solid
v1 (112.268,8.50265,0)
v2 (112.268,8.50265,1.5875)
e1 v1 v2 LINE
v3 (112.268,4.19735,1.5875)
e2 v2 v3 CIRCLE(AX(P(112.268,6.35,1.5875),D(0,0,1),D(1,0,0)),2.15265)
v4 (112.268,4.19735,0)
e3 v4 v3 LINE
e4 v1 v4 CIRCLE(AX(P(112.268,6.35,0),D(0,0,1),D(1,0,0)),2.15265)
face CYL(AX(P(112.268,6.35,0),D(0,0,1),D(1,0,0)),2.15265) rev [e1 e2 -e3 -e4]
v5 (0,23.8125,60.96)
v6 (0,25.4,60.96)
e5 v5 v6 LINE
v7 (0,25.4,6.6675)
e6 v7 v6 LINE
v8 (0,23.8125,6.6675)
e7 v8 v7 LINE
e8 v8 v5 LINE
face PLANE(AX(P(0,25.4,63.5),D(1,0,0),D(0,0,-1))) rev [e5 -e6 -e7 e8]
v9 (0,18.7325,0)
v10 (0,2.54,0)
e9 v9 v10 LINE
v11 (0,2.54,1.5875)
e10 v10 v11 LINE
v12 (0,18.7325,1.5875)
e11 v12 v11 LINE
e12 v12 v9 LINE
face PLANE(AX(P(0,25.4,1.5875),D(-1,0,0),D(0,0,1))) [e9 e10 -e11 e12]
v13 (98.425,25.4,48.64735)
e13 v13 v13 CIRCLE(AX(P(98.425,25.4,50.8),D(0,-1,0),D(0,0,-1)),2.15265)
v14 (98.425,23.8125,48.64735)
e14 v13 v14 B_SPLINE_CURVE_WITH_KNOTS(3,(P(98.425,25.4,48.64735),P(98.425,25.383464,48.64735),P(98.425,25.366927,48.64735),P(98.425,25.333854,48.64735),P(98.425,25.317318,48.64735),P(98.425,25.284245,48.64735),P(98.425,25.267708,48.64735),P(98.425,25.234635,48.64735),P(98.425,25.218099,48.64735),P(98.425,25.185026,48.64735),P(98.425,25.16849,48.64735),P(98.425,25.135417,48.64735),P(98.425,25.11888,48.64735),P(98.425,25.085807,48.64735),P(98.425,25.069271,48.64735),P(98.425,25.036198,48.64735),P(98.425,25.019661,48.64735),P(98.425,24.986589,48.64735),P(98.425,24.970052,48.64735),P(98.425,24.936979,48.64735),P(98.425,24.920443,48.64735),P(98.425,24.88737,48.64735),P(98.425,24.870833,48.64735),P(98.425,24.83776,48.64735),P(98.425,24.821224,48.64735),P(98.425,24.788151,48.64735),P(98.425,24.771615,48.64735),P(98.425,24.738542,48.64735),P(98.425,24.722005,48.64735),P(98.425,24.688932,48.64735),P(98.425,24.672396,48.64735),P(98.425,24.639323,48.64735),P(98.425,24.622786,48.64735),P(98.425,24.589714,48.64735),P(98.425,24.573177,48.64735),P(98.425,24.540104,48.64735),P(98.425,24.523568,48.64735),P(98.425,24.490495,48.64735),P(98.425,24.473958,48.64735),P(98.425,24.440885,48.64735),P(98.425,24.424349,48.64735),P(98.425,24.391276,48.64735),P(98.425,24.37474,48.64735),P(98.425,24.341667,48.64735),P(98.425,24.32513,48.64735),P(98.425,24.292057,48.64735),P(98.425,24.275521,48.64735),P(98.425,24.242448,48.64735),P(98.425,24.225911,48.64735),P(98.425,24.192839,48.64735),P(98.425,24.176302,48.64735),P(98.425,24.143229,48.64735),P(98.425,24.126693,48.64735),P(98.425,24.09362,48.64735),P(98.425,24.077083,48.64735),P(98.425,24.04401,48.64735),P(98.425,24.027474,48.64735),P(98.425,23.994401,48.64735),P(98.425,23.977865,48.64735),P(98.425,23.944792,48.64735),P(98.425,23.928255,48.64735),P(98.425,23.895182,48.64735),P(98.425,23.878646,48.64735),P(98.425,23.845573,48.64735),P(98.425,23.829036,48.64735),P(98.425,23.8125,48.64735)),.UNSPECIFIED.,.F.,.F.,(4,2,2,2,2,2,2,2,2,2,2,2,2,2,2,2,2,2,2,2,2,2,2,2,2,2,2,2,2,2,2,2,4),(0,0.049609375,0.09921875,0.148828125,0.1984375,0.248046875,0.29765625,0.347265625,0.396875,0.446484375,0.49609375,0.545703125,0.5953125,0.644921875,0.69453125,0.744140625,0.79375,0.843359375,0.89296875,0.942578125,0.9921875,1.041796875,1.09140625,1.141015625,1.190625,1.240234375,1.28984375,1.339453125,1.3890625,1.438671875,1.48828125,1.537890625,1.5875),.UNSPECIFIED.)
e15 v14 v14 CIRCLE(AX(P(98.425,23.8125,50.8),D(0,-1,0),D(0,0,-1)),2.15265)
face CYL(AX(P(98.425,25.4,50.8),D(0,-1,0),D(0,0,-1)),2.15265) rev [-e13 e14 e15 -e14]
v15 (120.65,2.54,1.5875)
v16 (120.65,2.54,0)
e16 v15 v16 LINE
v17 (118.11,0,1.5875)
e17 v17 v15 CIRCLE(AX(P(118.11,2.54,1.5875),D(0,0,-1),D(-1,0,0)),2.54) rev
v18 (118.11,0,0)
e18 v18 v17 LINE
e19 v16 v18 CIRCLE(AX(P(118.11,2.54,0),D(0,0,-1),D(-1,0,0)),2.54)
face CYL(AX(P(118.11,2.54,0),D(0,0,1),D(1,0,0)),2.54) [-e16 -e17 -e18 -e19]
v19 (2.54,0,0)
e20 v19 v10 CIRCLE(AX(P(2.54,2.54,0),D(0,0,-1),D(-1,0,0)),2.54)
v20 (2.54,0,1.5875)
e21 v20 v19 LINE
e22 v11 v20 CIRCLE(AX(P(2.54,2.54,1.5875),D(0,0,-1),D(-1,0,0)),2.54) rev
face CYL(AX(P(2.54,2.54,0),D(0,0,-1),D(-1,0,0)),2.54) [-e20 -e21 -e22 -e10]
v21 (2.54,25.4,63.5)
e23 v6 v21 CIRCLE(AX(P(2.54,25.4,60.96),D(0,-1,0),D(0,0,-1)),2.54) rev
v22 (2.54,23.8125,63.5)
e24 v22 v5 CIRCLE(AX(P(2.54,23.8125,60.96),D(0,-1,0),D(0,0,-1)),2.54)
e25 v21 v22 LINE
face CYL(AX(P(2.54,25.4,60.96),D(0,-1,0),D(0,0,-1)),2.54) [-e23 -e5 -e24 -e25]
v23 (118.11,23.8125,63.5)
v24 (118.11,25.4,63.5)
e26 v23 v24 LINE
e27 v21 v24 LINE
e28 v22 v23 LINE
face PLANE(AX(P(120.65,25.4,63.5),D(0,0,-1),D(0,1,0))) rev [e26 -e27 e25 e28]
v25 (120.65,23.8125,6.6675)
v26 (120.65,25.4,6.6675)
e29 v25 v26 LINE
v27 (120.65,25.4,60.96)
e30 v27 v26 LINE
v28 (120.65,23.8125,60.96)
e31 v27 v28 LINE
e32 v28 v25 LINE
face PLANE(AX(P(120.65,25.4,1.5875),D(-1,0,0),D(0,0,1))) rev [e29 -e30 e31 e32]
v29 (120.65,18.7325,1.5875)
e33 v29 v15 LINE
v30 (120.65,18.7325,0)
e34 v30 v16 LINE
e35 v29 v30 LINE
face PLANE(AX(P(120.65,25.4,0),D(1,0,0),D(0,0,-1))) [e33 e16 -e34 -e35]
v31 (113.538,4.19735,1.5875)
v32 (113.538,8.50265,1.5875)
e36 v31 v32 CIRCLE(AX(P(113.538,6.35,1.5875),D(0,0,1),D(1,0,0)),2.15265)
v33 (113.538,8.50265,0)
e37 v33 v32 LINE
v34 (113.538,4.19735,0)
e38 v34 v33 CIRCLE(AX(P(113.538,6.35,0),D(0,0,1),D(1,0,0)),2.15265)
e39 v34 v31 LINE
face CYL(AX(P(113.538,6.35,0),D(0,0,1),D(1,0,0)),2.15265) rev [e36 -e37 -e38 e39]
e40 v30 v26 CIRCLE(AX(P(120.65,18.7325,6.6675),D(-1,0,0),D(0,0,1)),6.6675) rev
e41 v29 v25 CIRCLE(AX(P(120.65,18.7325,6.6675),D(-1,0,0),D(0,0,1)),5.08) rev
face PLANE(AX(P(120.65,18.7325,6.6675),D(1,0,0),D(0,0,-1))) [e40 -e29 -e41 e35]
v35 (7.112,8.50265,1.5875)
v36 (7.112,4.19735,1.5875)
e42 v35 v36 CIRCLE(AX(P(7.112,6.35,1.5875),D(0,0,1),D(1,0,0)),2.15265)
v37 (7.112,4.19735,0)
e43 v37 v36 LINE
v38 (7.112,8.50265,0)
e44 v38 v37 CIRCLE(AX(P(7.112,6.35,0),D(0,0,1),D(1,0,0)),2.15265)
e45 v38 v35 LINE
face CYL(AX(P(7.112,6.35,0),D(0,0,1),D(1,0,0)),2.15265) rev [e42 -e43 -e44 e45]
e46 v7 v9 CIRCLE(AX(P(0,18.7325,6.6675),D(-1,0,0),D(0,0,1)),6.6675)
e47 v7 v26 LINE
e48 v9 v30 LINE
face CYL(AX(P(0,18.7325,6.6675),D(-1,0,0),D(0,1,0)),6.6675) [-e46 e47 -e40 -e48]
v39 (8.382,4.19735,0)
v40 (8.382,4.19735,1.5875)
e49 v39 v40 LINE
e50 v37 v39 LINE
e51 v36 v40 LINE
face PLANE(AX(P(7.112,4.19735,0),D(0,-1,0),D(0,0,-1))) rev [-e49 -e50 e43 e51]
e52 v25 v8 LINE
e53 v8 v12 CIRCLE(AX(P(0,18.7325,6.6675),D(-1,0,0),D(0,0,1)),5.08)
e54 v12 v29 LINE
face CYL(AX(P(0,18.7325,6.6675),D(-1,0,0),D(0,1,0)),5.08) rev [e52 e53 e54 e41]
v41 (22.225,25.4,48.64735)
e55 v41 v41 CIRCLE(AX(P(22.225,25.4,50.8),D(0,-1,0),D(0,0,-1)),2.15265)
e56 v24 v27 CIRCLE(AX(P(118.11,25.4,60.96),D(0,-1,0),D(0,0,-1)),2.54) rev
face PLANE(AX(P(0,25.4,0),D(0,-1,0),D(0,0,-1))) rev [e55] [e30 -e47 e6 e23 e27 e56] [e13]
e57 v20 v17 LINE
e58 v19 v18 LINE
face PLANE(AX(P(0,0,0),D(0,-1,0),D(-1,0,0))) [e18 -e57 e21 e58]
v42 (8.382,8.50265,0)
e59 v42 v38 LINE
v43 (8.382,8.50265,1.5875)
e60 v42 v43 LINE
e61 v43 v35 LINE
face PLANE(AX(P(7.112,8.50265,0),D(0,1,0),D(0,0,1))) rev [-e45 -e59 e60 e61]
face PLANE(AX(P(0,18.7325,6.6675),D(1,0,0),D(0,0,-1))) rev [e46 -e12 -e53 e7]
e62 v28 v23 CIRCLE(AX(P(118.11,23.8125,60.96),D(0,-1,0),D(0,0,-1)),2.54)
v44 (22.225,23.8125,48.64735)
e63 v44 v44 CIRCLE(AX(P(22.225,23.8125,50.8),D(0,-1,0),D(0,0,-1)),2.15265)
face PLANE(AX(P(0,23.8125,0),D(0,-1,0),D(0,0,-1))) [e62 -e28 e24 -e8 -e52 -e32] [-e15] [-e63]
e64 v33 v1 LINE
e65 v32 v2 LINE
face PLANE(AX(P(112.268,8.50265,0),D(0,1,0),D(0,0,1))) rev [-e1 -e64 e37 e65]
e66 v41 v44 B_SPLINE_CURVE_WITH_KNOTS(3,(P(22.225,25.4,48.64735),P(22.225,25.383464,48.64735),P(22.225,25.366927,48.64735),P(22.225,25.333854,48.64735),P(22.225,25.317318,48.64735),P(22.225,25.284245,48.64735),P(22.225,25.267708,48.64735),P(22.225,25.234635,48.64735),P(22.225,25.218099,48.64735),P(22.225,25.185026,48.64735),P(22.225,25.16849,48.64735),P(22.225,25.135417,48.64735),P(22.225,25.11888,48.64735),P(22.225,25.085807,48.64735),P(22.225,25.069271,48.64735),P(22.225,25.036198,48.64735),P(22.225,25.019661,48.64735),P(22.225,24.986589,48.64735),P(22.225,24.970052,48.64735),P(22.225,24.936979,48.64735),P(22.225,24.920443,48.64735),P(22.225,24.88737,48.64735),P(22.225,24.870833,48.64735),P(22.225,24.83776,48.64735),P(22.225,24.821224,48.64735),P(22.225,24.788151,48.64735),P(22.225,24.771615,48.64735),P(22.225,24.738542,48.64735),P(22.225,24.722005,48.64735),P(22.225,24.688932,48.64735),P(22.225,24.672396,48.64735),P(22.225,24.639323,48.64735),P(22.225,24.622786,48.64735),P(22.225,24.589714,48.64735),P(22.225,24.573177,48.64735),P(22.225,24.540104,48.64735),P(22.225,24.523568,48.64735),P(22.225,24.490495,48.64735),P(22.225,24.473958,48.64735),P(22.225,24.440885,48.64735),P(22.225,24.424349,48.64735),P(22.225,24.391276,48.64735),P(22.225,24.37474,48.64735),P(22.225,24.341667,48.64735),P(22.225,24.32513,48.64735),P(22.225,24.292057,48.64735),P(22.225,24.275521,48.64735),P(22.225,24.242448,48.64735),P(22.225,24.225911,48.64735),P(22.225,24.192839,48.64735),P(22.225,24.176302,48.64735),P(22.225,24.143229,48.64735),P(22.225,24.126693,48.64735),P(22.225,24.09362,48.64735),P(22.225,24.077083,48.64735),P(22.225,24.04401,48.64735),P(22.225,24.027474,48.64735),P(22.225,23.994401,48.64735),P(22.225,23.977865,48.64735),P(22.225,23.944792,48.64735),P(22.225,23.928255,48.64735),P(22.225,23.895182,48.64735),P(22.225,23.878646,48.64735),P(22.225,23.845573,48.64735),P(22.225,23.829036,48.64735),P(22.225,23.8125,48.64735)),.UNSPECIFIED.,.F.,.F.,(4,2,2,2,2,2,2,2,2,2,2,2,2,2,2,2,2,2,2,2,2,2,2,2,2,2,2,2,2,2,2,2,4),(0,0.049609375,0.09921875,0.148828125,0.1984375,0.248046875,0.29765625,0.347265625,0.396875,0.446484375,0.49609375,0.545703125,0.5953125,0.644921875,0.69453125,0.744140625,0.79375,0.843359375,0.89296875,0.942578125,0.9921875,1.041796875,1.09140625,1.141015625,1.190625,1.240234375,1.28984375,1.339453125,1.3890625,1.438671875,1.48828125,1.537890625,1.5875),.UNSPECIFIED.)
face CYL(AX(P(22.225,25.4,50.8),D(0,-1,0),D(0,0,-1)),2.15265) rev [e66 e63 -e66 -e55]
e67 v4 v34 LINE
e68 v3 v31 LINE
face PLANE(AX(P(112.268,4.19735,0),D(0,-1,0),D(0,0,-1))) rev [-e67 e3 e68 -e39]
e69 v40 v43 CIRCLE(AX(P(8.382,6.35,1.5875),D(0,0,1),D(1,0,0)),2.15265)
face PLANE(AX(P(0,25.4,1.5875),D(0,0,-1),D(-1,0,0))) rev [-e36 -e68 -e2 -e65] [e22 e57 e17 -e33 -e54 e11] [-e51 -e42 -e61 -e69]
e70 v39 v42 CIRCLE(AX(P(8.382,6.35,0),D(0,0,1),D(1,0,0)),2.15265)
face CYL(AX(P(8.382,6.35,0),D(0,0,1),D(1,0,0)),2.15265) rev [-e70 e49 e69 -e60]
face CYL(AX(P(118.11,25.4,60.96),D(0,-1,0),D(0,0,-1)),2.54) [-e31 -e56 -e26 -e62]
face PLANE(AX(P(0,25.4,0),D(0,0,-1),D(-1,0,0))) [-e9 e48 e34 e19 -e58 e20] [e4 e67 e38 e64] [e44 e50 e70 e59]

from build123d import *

# Parameters (mm, degrees)
SKETCH2_W                    = 120.65
SKETCH2_H                    = 1.5875
BASE_FLANGE1_DEPTH           = 25.4
EDGE_FLANGE1_STRIP_W         = 16.51
EDGE_FLANGE1_STRIP_H         = 1.5875
EDGE_FLANGE1_STRIP_CUT_DEPTH = 120.65
EDGE_FLANGE1_DEPTH           = 120.65
FILLET1_R                    = 2.54
CUT_EXTRUDE1_DEPTH           = 138.966445762
SKETCH11_R                   = 2.15265
CUT_EXTRUDE2_DEPTH           = 139.404146095


# Sheet-metal steps are written as plain solids
with BuildPart() as part:
    # Sketch2 → Base-Flange1 (new body)
    with BuildSketch(Plane(origin=(0, 0, 0), x_dir=(1, 0, 0), z_dir=(0, 1, 0))):
        with Locations((60.325, -0.79375)):
            Rectangle(SKETCH2_W, SKETCH2_H)
    extrude(amount=BASE_FLANGE1_DEPTH)

    # Edge-Flange1 strip (across the edge) → Edge-Flange1 strip cut (cut)
    with BuildSketch(Plane(origin=(120.65, 25.4, 1.5875), x_dir=(0, -1, 0), z_dir=(-1, 0, 0))):
        with Locations((-1.5875, -0.79375)):
            Rectangle(EDGE_FLANGE1_STRIP_W, EDGE_FLANGE1_STRIP_H)
    extrude(amount=EDGE_FLANGE1_STRIP_CUT_DEPTH, mode=Mode.SUBTRACT)

    # Edge-Flange1 section (across the edge) → Edge-Flange1 (add)
    with BuildSketch(Plane(origin=(120.65, 25.4, 1.5875), x_dir=(0, -1, 0), z_dir=(-1, 0, 0))):
        with BuildLine():
            Line((0, 5.08), (0, 61.9125))
            Line((0, 61.9125), (1.5875, 61.9125))
            Line((1.5875, 61.9125), (1.5875, 5.08))
            ThreePointArc((1.5875, 5.08), (3.075397552, 1.487897552), (6.6675, 0))
            Line((6.6675, 0), (6.6675, -1.5875))
            ThreePointArc((6.6675, -1.5875), (1.952865536, 0.365365536), (0, 5.08))
        make_face()
    extrude(amount=EDGE_FLANGE1_DEPTH)

    # Fillet1
    fillet1_edges = [part.edges().sort_by_distance(p)[0] for p in [
        (120.65, 24.60625, 63.5),
        (0, 24.60625, 63.5),
        (0, 0, 0.79375),
        (120.65, 0, 0.79375),
    ]]
    fillet(fillet1_edges, radius=FILLET1_R)

    # Sketch10 → Cut-Extrude1 (cut, through all)
    with BuildSketch(Plane.XY.offset(1.5875)):
        with BuildLine():
            Line((7.112, 8.50265), (8.382, 8.50265))
            ThreePointArc((8.382, 8.50265), (10.53465, 6.35), (8.382, 4.19735))
            Line((8.382, 4.19735), (7.112, 4.19735))
            ThreePointArc((7.112, 4.19735), (4.95935, 6.35), (7.112, 8.50265))
        make_face()
        with BuildLine():
            Line((112.268, 8.50265), (113.538, 8.50265))
            ThreePointArc((113.538, 8.50265), (115.69065, 6.35), (113.538, 4.19735))
            Line((113.538, 4.19735), (112.268, 4.19735))
            ThreePointArc((112.268, 4.19735), (110.11535, 6.35), (112.268, 8.50265))
        make_face()
    extrude(amount=-CUT_EXTRUDE1_DEPTH, mode=Mode.SUBTRACT)

    # Sketch11 → Cut-Extrude2 (cut, through all)
    with BuildSketch(Plane.XZ.offset(-23.8125)):
        with Locations(Location((22.225, 50.8, 0), (0, 0, 270))):
            Circle(SKETCH11_R)
        with Locations(Location((98.425, 50.8, 0), (0, 0, 270))):
            Circle(SKETCH11_R)
    extrude(amount=-CUT_EXTRUDE2_DEPTH, mode=Mode.SUBTRACT)


solid = part.part
